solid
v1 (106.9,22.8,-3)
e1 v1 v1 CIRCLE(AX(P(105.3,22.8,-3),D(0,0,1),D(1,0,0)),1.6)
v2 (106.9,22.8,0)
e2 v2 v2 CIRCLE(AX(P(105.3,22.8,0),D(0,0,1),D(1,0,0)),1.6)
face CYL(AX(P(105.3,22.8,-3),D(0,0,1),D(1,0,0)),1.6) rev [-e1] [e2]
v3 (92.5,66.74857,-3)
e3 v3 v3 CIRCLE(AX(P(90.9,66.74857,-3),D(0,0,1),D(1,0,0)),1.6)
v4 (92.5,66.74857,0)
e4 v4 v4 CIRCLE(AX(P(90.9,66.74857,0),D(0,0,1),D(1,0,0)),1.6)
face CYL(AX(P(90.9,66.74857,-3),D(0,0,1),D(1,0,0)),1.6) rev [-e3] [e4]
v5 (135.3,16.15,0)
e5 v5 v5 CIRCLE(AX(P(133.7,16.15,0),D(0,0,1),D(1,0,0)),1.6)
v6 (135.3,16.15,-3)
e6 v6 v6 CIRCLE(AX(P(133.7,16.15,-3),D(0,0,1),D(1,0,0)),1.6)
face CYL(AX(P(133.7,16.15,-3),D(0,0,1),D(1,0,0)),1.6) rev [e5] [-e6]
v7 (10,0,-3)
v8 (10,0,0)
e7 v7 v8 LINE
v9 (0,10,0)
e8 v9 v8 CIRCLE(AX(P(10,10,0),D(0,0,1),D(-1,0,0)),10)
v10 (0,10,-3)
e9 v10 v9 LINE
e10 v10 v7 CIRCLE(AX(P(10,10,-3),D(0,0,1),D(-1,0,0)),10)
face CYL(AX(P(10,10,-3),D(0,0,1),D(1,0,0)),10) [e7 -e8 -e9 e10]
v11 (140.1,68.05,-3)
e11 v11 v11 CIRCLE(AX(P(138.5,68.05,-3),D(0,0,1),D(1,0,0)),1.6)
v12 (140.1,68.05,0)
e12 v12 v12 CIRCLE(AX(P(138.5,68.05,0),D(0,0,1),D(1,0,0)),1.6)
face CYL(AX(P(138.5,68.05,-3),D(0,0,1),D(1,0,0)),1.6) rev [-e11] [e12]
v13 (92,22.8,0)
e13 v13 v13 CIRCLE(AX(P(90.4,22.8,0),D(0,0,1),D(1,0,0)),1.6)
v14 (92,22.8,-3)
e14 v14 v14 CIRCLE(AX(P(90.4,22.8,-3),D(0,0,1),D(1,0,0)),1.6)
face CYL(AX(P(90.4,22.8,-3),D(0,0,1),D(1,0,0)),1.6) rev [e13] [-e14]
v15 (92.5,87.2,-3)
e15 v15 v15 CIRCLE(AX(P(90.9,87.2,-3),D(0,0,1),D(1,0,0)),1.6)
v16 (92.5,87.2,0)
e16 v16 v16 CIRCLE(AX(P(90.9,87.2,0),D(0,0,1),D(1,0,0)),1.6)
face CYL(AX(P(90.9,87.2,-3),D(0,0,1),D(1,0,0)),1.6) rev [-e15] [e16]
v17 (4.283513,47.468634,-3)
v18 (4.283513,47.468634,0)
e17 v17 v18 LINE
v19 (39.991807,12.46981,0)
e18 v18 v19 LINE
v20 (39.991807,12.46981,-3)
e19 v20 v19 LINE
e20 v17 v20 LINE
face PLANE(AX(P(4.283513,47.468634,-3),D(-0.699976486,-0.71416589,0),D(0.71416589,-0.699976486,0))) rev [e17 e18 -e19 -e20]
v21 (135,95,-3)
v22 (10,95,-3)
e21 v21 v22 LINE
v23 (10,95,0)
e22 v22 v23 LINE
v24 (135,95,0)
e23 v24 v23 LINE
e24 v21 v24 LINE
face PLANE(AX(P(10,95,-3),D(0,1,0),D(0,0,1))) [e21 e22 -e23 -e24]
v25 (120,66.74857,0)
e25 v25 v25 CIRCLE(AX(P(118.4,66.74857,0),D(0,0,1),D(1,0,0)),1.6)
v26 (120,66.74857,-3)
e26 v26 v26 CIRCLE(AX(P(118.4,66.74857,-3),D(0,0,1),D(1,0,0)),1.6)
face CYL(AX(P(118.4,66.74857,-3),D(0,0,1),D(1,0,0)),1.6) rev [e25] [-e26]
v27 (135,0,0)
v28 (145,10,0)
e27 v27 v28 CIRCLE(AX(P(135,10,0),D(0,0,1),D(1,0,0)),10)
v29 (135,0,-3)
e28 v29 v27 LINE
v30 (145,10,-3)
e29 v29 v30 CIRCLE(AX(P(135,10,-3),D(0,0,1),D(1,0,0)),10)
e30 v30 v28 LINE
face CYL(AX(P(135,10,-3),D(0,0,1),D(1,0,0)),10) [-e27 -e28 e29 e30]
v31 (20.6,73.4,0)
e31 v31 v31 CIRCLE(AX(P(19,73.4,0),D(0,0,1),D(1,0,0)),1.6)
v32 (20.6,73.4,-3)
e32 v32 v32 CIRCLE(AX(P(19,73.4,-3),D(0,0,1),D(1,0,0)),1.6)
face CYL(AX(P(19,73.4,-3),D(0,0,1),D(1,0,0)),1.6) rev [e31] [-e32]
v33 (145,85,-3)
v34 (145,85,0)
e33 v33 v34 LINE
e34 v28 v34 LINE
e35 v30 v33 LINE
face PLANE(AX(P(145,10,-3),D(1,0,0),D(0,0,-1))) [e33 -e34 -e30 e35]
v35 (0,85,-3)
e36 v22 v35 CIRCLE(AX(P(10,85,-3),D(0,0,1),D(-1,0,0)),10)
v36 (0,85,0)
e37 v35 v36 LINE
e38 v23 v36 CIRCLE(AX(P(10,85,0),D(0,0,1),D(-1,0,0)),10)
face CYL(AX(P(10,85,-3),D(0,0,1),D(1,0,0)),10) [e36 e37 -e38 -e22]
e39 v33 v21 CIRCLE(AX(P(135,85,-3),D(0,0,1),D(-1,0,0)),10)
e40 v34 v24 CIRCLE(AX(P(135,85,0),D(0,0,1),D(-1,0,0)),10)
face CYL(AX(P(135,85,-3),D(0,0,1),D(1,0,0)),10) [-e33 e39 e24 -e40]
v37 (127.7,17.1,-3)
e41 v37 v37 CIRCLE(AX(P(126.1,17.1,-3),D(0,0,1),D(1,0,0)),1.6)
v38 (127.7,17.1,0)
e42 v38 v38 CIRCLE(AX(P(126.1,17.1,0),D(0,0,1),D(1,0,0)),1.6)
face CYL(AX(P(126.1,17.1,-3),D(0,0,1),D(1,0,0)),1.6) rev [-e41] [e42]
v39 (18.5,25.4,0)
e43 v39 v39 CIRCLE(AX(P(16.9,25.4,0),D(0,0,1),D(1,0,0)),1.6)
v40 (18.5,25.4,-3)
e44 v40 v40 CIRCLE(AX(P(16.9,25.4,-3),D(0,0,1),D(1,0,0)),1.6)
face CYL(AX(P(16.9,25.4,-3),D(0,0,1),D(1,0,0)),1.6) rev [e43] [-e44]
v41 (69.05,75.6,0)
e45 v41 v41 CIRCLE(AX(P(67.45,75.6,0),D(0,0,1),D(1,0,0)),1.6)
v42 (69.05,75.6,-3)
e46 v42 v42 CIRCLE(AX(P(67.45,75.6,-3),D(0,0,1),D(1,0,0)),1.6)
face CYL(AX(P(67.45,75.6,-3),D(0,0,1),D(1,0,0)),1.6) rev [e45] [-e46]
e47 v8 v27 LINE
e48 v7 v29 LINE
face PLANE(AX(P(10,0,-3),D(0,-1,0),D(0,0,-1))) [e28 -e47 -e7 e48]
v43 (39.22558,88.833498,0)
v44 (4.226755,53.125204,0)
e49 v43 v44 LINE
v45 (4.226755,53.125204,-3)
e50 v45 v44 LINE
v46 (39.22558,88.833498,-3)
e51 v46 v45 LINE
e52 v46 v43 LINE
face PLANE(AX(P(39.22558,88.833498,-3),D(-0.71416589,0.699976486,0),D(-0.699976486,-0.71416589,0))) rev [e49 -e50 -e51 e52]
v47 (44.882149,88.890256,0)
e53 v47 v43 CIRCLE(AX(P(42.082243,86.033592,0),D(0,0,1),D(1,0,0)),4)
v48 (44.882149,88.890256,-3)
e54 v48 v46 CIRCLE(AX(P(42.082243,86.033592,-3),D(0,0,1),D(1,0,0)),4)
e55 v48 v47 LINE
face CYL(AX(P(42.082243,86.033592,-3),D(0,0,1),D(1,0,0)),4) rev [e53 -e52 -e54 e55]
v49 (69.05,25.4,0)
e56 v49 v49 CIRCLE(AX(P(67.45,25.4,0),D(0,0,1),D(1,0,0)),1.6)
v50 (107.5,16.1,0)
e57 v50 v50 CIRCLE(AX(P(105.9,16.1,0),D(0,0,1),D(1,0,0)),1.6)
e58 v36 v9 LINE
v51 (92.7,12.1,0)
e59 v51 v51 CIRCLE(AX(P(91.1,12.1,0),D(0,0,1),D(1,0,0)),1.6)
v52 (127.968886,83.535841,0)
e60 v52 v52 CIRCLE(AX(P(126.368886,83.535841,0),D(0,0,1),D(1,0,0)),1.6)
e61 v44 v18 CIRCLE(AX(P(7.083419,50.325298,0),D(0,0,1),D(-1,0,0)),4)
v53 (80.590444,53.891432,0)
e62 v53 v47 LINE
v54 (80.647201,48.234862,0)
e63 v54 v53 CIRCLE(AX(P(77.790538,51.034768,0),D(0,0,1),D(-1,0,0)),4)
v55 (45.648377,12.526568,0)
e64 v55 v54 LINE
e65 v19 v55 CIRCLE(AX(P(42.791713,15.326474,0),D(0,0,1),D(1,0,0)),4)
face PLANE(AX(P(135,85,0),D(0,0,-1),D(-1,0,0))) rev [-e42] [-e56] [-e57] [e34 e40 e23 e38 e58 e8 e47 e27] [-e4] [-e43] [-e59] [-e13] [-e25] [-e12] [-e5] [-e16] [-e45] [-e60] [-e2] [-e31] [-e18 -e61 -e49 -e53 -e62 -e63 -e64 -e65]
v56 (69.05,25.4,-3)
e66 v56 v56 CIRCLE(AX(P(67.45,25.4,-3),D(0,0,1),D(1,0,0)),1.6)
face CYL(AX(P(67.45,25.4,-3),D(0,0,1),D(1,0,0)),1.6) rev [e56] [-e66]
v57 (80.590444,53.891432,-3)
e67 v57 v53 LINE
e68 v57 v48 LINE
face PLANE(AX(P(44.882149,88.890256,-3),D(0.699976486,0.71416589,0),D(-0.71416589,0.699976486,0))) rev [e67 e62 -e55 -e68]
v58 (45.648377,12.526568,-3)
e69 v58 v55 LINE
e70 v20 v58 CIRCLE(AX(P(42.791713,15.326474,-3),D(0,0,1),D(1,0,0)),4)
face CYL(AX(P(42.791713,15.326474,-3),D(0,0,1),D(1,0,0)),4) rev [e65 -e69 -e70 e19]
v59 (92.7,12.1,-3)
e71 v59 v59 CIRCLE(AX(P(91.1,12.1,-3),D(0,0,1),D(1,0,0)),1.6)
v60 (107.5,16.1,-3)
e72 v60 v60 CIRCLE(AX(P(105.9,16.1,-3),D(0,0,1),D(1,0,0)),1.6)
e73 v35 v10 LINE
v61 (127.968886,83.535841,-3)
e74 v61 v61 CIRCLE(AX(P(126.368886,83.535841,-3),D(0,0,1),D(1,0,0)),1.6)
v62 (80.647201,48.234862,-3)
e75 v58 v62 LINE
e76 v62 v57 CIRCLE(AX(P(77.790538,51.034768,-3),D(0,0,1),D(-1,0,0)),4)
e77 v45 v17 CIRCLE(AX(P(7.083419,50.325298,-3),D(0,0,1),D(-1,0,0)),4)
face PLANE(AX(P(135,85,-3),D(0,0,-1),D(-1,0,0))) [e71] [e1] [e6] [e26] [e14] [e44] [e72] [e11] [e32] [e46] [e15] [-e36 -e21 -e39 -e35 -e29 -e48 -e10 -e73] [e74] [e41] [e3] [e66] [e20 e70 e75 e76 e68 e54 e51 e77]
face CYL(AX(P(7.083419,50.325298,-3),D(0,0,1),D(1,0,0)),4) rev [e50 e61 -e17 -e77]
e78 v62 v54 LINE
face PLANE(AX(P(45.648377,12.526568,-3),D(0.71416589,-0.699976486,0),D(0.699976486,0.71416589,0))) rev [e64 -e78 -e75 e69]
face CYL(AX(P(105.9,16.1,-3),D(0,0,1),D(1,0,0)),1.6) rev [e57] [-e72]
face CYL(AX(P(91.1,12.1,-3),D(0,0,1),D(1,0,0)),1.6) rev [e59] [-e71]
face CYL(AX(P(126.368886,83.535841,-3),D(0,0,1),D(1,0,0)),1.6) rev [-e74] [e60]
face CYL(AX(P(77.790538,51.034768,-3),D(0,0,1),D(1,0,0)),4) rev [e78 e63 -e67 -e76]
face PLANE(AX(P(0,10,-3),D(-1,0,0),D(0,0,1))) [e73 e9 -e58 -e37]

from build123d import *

# Parameters (mm, degrees)
ESQUISSE1_R               = 1.6
T_LE_DE_BASE_PLI_E1_DEPTH = 3


# Sheet-metal steps are written as plain solids
with BuildPart() as part:
    # Esquisse1 → Tôle de base pliée1 (new body)
    with BuildSketch(Plane.XY):
        with BuildLine():
            Line((10, 0), (135, 0))
            ThreePointArc((135, 0), (142.071067812, 2.928932188), (145, 10))
            Line((145, 10), (145, 85))
            ThreePointArc((145, 85), (142.071067812, 92.071067812), (135, 95))
            Line((135, 95), (10, 95))
            ThreePointArc((10, 95), (2.928932188, 92.071067812), (0, 85))
            Line((0, 85), (0, 10))
            ThreePointArc((0, 10), (2.928932188, 2.928932188), (10, 0))
        make_face()
        with Locations((90.9, 87.2)):
            Circle(ESQUISSE1_R, mode=Mode.SUBTRACT)
        with Locations((126.368886423, 83.535840528)):
            Circle(ESQUISSE1_R, mode=Mode.SUBTRACT)
        with Locations((138.5, 68.05)):
            Circle(ESQUISSE1_R, mode=Mode.SUBTRACT)
        with Locations((118.4, 66.74856953)):
            Circle(ESQUISSE1_R, mode=Mode.SUBTRACT)
        with Locations((90.9, 66.74856953)):
            Circle(ESQUISSE1_R, mode=Mode.SUBTRACT)
        with Locations((126.1, 17.1)):
            Circle(ESQUISSE1_R, mode=Mode.SUBTRACT)
        with Locations((133.7, 16.15)):
            Circle(ESQUISSE1_R, mode=Mode.SUBTRACT)
        with Locations((105.3, 22.8)):
            Circle(ESQUISSE1_R, mode=Mode.SUBTRACT)
        with Locations((90.4, 22.8)):
            Circle(ESQUISSE1_R, mode=Mode.SUBTRACT)
        with Locations((91.1, 12.1)):
            Circle(ESQUISSE1_R, mode=Mode.SUBTRACT)
        with Locations((105.9, 16.1)):
            Circle(ESQUISSE1_R, mode=Mode.SUBTRACT)
        with Locations((67.45, 25.4)):
            Circle(ESQUISSE1_R, mode=Mode.SUBTRACT)
        with Locations((19, 73.4)):
            Circle(ESQUISSE1_R, mode=Mode.SUBTRACT)
        with Locations((16.9, 25.4)):
            Circle(ESQUISSE1_R, mode=Mode.SUBTRACT)
        with Locations((67.45, 75.6)):
            Circle(ESQUISSE1_R, mode=Mode.SUBTRACT)
        with BuildLine():
            Line((44.882149159, 88.890256032), (80.590443676, 53.891431727))
            ThreePointArc((80.590443676, 53.891431727), (81.790336387, 51.074901862), (80.647201293, 48.234862221))
            Line((80.647201293, 48.234862221), (45.648376988, 12.526567705))
            ThreePointArc((45.648376988, 12.526567705), (42.831847123, 11.326674993), (39.991807483, 12.469810088))
            Line((39.991807483, 12.469810088), (4.283512966, 47.468634392))
            ThreePointArc((4.283512966, 47.468634392), (3.083620254, 50.285164258), (4.226755349, 53.125203898))
            Line((4.226755349, 53.125203898), (39.225579653, 88.833498415))
            ThreePointArc((39.225579653, 88.833498415), (42.042109519, 90.033391126), (44.882149159, 88.890256032))
        make_face(mode=Mode.SUBTRACT)
    extrude(amount=-T_LE_DE_BASE_PLI_E1_DEPTH)


solid = part.part
